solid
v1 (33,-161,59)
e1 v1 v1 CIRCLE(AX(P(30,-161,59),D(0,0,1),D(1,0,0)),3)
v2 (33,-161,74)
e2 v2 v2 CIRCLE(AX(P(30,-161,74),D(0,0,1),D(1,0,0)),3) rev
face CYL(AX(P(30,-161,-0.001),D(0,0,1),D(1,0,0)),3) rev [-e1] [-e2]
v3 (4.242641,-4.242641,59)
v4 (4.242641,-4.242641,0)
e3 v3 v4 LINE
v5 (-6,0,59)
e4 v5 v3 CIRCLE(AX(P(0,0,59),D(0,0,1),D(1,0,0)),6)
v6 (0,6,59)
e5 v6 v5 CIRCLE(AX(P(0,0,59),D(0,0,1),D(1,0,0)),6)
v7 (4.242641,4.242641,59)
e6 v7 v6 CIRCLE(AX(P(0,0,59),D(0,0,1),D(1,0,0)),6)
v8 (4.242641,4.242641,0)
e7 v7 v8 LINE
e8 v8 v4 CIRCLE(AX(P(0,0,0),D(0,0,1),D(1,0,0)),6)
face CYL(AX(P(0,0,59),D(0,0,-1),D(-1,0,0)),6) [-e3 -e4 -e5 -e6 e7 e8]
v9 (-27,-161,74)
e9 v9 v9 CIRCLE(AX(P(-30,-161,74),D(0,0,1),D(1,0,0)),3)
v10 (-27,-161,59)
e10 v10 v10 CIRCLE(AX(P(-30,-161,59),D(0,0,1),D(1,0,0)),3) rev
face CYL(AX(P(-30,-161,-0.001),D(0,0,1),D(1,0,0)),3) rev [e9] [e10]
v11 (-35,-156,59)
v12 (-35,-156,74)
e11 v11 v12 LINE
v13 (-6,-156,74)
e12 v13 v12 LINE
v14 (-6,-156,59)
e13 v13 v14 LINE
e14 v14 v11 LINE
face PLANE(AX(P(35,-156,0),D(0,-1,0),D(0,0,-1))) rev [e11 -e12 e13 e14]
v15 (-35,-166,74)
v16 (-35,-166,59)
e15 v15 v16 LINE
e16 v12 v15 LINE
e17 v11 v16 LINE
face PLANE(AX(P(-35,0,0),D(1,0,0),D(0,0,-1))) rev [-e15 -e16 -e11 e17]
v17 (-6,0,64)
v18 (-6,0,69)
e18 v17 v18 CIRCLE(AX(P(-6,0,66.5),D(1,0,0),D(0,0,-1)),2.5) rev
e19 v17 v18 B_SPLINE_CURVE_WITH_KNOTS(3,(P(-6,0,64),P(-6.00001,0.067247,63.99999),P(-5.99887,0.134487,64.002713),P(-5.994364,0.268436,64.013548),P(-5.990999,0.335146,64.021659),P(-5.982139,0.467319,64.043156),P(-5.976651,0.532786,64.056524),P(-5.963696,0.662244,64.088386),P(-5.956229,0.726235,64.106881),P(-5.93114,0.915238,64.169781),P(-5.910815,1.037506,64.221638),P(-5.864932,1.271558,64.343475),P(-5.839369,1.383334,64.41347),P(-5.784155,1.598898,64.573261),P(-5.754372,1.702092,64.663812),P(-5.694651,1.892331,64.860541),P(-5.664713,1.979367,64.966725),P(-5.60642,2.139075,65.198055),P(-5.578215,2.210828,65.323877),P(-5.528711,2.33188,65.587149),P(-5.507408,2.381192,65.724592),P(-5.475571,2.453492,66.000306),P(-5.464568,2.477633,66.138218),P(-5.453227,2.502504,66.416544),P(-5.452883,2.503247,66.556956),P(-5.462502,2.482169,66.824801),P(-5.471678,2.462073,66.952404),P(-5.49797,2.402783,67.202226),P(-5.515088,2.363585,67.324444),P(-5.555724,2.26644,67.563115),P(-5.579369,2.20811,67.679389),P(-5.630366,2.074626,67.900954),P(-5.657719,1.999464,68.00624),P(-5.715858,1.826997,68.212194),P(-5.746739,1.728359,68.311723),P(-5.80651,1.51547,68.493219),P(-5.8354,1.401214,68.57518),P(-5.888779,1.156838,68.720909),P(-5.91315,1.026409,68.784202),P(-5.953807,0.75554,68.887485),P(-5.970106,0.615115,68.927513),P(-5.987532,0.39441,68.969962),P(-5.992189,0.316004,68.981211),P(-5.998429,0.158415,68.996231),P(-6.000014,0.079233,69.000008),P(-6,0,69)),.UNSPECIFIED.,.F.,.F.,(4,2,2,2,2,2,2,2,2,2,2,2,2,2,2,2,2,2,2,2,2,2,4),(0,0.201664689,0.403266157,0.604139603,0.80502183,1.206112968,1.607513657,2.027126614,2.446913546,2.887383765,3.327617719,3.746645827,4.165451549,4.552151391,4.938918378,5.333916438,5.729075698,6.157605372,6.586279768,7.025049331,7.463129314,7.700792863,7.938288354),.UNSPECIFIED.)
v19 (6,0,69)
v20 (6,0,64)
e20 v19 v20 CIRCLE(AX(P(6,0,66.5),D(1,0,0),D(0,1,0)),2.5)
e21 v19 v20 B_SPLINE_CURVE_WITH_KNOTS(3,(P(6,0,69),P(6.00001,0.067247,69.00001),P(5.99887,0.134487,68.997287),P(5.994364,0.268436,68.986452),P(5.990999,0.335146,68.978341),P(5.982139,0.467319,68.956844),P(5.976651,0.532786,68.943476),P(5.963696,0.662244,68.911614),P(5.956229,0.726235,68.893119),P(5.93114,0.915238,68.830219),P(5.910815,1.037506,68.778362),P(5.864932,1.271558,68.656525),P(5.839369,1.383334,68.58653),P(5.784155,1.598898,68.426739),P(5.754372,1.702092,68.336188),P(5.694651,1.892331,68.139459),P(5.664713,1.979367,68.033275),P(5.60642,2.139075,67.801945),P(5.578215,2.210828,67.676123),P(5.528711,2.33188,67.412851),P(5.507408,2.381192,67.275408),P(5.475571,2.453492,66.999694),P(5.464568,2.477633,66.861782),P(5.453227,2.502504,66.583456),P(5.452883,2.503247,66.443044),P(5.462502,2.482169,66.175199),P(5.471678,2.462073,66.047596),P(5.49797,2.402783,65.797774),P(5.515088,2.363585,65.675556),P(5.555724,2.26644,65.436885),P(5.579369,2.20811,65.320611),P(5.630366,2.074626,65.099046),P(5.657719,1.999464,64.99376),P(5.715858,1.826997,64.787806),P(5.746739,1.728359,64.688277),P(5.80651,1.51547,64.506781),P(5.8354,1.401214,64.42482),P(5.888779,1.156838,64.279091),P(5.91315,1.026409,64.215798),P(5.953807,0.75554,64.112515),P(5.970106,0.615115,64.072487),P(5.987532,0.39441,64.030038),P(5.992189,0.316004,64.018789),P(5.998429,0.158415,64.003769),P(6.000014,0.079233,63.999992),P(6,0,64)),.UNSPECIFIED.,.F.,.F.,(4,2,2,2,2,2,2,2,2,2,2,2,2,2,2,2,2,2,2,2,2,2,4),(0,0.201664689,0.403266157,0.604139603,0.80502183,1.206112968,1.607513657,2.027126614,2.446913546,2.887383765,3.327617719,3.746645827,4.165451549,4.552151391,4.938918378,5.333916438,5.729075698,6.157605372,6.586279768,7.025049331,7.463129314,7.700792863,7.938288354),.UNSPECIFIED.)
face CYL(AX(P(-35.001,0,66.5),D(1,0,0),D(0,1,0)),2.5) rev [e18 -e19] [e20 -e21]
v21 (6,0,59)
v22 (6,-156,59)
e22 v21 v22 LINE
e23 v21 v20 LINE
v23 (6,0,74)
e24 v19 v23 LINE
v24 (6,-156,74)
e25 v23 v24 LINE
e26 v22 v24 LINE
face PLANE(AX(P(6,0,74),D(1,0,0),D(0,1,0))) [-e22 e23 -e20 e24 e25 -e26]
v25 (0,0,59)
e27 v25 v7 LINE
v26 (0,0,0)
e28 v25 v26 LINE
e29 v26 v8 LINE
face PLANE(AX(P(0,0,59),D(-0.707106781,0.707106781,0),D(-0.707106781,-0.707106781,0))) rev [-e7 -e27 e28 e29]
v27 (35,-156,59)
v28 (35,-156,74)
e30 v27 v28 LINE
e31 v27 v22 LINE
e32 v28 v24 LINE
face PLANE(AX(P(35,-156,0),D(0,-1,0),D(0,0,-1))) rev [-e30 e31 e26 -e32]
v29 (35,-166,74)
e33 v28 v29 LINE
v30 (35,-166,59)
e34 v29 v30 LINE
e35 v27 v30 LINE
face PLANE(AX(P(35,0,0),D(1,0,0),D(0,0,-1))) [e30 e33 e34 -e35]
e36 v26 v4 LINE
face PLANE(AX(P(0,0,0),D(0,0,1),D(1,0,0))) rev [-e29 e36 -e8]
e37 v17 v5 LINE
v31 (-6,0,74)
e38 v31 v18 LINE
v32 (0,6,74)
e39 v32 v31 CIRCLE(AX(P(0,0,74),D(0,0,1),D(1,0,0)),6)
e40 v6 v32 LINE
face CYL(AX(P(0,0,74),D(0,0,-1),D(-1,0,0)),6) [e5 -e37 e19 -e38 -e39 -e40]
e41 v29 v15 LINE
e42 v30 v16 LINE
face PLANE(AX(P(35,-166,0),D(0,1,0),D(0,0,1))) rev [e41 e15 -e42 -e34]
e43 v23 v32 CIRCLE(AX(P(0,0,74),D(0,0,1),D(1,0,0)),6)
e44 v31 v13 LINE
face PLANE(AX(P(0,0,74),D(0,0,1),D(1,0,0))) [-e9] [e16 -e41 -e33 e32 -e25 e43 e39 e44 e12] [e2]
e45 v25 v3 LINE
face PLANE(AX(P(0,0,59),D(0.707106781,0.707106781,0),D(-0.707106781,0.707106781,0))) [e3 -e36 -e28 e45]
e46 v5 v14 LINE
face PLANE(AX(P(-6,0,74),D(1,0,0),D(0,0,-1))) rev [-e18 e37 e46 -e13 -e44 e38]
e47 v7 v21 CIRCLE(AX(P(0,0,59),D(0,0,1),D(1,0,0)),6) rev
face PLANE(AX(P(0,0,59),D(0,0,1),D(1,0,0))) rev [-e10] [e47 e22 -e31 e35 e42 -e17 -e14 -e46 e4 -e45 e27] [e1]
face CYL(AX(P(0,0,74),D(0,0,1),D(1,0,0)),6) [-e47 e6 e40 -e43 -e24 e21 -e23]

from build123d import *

# Parameters (mm, degrees)
BOSS_EXTRU_1_DEPTH      = 59
BOSS_EXTRU_2_DEPTH      = 15
CONG_1_R                = 6
BOSS_EXTRU_3_DEPTH      = 150
ESQUISSE5_W             = 15
ESQUISSE5_H             = 10
BOSS_EXTRU_4_DEPTH      = 35
ENL_V_MAT_EXTRU_1_REACH = 187.086
ESQUISSE6_R             = 3
ENL_V_MAT_EXTRU_2_REACH = 188.314


with BuildPart() as part:
    # Esquisse1 → Boss.-Extru.1 (new body)
    with BuildSketch(Plane.XY):
        with BuildLine():
            Line((4.242640687, -4.242640687), (0, 0))
            Line((0, 0), (0, 6))
            ThreePointArc((0, 6), (-5.543277195, -2.296100594), (4.242640687, -4.242640687))
        make_face()
        with BuildLine():
            Line((0, 6), (0, 0))
            Line((0, 0), (4.242640687, 4.242640687))
            ThreePointArc((4.242640687, 4.242640687), (2.296100594, 5.543277195), (0, 6))
        make_face()
    extrude(amount=BOSS_EXTRU_1_DEPTH)

    # Esquisse2 → Boss.-Extru.2 (add)
    with BuildSketch(Plane.XY.offset(59)):
        with BuildLine():
            ThreePointArc((0, -6), (-4.242640708, -4.242640666), (-6, 5.9e-08))
            Line((-6, 5.9e-08), (-6, -6))
            Line((-6, -6), (0, -6))
        make_face()
        with BuildLine():
            Line((0, 0), (0, 6))
            ThreePointArc((0, 6), (-4.242640666, 4.242640708), (-6, 5.9e-08))
            ThreePointArc((-6, 5.9e-08), (-4.242640708, -4.242640666), (0, -6))
            Line((0, -6), (0, 0))
        make_face()
        with BuildLine():
            ThreePointArc((4.242640687, 4.242640687), (2.296100594, 5.543277195), (0, 6))
            Line((0, 6), (0, 0))
            Line((0, 0), (4.242640687, 4.242640687))
        make_face()
        with BuildLine():
            Line((6, 6), (0, 6))
            ThreePointArc((0, 6), (2.296100594, 5.543277195), (4.242640687, 4.242640687))
            Line((4.242640687, 4.242640687), (0, 0))
            Line((0, 0), (4.242640687, -4.242640687))
            ThreePointArc((4.242640687, -4.242640687), (2.296100594, -5.543277195), (0, -6))
            Line((0, -6), (6, -6))
            Line((6, -6), (6, 6))
        make_face()
        with BuildLine():
            ThreePointArc((-6, 5.9e-08), (-4.242640666, 4.242640708), (0, 6))
            Line((0, 6), (-6, 6))
            Line((-6, 6), (-6, 5.9e-08))
        make_face()
        with BuildLine():
            Line((4.242640687, -4.242640687), (0, 0))
            Line((0, 0), (0, -6))
            ThreePointArc((0, -6), (2.296100594, -5.543277195), (4.242640687, -4.242640687))
        make_face()
    extrude(amount=BOSS_EXTRU_2_DEPTH)

    # Congé1
    cong_1_edges = [part.edges().sort_by_distance(p)[0] for p in [
        (6, 6, 66.5),
        (-6, 6, 66.5),
    ]]
    fillet(cong_1_edges, radius=CONG_1_R - 0.0001)  # a hair under: the kernel refuses the full size

    # Esquisse4 → Boss.-Extru.3 (add)
    with BuildSketch(Plane.XZ.offset(6)):
        Polygon((0, 59), (6, 59), (6, 74), (-6, 74), (-6, 59), align=None)
    extrude(amount=BOSS_EXTRU_3_DEPTH)

    # Esquisse5 → Boss.-Extru.4 (add, symmetric)
    with BuildSketch(Plane(origin=(0, 0, 0), x_dir=(0, 0, -1), z_dir=(1, 0, 0))):
        with Locations((-66.5, -161)):
            Rectangle(ESQUISSE5_W, ESQUISSE5_H)
    extrude(amount=BOSS_EXTRU_4_DEPTH, both=True)

    # Esquisse6 → Enlèv. mat.-Extru.1 (cut, up to next)
    with BuildSketch(Plane.XY.offset(74), mode=Mode.PRIVATE) as enl_v_mat_extru_1_sk1:
        with Locations((-30, -161)):
            Circle(ESQUISSE6_R)
    enl_v_mat_extru_1_tool1 = extrude(enl_v_mat_extru_1_sk1.sketch, amount=-ENL_V_MAT_EXTRU_1_REACH, mode=Mode.PRIVATE) & part.part
    # Esquisse6 → Enlèv. mat.-Extru.1 (cut, up to next)
    with BuildSketch(Plane.XY.offset(74), mode=Mode.PRIVATE) as enl_v_mat_extru_1_sk2:
        with Locations((30, -161)):
            Circle(ESQUISSE6_R)
    enl_v_mat_extru_1_tool2 = extrude(enl_v_mat_extru_1_sk2.sketch, amount=-ENL_V_MAT_EXTRU_1_REACH, mode=Mode.PRIVATE) & part.part
    add(enl_v_mat_extru_1_tool1.solids().sort_by_distance((-30, -161, 74))[0], mode=Mode.SUBTRACT)
    add(enl_v_mat_extru_1_tool2.solids().sort_by_distance((30, -161, 74))[0], mode=Mode.SUBTRACT)

    # Esquisse7 → Enlèv. mat.-Extru.2 (cut, up to next)
    with BuildSketch(Plane(origin=(6, 0, 0), x_dir=(0, 0, -1), z_dir=(1, 0, 0)), mode=Mode.PRIVATE) as enl_v_mat_extru_2_sk1:
        with BuildLine():
            ThreePointArc((-69, 0), (-66.5, -2.5), (-64, 0))
            Line((-64, 0), (-69, 0))
        make_face()
    enl_v_mat_extru_2_tool1 = extrude(enl_v_mat_extru_2_sk1.sketch, amount=-ENL_V_MAT_EXTRU_2_REACH, mode=Mode.PRIVATE) & part.part
    # Esquisse7 → Enlèv. mat.-Extru.2 (cut, up to next)
    with BuildSketch(Plane(origin=(6, 0, 0), x_dir=(0, 0, -1), z_dir=(1, 0, 0)), mode=Mode.PRIVATE) as enl_v_mat_extru_2_sk2:
        with BuildLine():
            Line((-69, 0), (-64, 0))
            ThreePointArc((-64, 0), (-66.5, 2.5), (-69, 0))
        make_face()
    enl_v_mat_extru_2_tool2 = extrude(enl_v_mat_extru_2_sk2.sketch, amount=-ENL_V_MAT_EXTRU_2_REACH, mode=Mode.PRIVATE) & part.part
    # Esquisse7 → Enlèv. mat.-Extru.2 (cut, up to next)
    with BuildSketch(Plane(origin=(6, 0, 0), x_dir=(0, 0, -1), z_dir=(1, 0, 0)), mode=Mode.PRIVATE) as enl_v_mat_extru_2_sk3:
        with BuildLine():
            ThreePointArc((-69, 0), (-66.5, -2.5), (-64, 0))
            Line((-64, 0), (-69, 0))
        make_face()
    enl_v_mat_extru_2_tool3 = extrude(enl_v_mat_extru_2_sk3.sketch, amount=-ENL_V_MAT_EXTRU_2_REACH, mode=Mode.PRIVATE) & part.part
    # Esquisse7 → Enlèv. mat.-Extru.2 (cut, up to next)
    with BuildSketch(Plane(origin=(6, 0, 0), x_dir=(0, 0, -1), z_dir=(1, 0, 0)), mode=Mode.PRIVATE) as enl_v_mat_extru_2_sk4:
        with BuildLine():
            Line((-69, 0), (-64, 0))
            ThreePointArc((-64, 0), (-66.5, 2.5), (-69, 0))
        make_face()
    enl_v_mat_extru_2_tool4 = extrude(enl_v_mat_extru_2_sk4.sketch, amount=-ENL_V_MAT_EXTRU_2_REACH, mode=Mode.PRIVATE) & part.part
    add(enl_v_mat_extru_2_tool1.solids().sort_by_distance((6, -1.061033, 66.5))[0], mode=Mode.SUBTRACT)
    add(enl_v_mat_extru_2_tool2.solids().sort_by_distance((6, 1.061033, 66.5))[0], mode=Mode.SUBTRACT)
    add(enl_v_mat_extru_2_tool3.solids().sort_by_distance((6, -1.061033, 66.5))[0], mode=Mode.SUBTRACT)
    add(enl_v_mat_extru_2_tool4.solids().sort_by_distance((6, 1.061033, 66.5))[0], mode=Mode.SUBTRACT)


solid = part.part
